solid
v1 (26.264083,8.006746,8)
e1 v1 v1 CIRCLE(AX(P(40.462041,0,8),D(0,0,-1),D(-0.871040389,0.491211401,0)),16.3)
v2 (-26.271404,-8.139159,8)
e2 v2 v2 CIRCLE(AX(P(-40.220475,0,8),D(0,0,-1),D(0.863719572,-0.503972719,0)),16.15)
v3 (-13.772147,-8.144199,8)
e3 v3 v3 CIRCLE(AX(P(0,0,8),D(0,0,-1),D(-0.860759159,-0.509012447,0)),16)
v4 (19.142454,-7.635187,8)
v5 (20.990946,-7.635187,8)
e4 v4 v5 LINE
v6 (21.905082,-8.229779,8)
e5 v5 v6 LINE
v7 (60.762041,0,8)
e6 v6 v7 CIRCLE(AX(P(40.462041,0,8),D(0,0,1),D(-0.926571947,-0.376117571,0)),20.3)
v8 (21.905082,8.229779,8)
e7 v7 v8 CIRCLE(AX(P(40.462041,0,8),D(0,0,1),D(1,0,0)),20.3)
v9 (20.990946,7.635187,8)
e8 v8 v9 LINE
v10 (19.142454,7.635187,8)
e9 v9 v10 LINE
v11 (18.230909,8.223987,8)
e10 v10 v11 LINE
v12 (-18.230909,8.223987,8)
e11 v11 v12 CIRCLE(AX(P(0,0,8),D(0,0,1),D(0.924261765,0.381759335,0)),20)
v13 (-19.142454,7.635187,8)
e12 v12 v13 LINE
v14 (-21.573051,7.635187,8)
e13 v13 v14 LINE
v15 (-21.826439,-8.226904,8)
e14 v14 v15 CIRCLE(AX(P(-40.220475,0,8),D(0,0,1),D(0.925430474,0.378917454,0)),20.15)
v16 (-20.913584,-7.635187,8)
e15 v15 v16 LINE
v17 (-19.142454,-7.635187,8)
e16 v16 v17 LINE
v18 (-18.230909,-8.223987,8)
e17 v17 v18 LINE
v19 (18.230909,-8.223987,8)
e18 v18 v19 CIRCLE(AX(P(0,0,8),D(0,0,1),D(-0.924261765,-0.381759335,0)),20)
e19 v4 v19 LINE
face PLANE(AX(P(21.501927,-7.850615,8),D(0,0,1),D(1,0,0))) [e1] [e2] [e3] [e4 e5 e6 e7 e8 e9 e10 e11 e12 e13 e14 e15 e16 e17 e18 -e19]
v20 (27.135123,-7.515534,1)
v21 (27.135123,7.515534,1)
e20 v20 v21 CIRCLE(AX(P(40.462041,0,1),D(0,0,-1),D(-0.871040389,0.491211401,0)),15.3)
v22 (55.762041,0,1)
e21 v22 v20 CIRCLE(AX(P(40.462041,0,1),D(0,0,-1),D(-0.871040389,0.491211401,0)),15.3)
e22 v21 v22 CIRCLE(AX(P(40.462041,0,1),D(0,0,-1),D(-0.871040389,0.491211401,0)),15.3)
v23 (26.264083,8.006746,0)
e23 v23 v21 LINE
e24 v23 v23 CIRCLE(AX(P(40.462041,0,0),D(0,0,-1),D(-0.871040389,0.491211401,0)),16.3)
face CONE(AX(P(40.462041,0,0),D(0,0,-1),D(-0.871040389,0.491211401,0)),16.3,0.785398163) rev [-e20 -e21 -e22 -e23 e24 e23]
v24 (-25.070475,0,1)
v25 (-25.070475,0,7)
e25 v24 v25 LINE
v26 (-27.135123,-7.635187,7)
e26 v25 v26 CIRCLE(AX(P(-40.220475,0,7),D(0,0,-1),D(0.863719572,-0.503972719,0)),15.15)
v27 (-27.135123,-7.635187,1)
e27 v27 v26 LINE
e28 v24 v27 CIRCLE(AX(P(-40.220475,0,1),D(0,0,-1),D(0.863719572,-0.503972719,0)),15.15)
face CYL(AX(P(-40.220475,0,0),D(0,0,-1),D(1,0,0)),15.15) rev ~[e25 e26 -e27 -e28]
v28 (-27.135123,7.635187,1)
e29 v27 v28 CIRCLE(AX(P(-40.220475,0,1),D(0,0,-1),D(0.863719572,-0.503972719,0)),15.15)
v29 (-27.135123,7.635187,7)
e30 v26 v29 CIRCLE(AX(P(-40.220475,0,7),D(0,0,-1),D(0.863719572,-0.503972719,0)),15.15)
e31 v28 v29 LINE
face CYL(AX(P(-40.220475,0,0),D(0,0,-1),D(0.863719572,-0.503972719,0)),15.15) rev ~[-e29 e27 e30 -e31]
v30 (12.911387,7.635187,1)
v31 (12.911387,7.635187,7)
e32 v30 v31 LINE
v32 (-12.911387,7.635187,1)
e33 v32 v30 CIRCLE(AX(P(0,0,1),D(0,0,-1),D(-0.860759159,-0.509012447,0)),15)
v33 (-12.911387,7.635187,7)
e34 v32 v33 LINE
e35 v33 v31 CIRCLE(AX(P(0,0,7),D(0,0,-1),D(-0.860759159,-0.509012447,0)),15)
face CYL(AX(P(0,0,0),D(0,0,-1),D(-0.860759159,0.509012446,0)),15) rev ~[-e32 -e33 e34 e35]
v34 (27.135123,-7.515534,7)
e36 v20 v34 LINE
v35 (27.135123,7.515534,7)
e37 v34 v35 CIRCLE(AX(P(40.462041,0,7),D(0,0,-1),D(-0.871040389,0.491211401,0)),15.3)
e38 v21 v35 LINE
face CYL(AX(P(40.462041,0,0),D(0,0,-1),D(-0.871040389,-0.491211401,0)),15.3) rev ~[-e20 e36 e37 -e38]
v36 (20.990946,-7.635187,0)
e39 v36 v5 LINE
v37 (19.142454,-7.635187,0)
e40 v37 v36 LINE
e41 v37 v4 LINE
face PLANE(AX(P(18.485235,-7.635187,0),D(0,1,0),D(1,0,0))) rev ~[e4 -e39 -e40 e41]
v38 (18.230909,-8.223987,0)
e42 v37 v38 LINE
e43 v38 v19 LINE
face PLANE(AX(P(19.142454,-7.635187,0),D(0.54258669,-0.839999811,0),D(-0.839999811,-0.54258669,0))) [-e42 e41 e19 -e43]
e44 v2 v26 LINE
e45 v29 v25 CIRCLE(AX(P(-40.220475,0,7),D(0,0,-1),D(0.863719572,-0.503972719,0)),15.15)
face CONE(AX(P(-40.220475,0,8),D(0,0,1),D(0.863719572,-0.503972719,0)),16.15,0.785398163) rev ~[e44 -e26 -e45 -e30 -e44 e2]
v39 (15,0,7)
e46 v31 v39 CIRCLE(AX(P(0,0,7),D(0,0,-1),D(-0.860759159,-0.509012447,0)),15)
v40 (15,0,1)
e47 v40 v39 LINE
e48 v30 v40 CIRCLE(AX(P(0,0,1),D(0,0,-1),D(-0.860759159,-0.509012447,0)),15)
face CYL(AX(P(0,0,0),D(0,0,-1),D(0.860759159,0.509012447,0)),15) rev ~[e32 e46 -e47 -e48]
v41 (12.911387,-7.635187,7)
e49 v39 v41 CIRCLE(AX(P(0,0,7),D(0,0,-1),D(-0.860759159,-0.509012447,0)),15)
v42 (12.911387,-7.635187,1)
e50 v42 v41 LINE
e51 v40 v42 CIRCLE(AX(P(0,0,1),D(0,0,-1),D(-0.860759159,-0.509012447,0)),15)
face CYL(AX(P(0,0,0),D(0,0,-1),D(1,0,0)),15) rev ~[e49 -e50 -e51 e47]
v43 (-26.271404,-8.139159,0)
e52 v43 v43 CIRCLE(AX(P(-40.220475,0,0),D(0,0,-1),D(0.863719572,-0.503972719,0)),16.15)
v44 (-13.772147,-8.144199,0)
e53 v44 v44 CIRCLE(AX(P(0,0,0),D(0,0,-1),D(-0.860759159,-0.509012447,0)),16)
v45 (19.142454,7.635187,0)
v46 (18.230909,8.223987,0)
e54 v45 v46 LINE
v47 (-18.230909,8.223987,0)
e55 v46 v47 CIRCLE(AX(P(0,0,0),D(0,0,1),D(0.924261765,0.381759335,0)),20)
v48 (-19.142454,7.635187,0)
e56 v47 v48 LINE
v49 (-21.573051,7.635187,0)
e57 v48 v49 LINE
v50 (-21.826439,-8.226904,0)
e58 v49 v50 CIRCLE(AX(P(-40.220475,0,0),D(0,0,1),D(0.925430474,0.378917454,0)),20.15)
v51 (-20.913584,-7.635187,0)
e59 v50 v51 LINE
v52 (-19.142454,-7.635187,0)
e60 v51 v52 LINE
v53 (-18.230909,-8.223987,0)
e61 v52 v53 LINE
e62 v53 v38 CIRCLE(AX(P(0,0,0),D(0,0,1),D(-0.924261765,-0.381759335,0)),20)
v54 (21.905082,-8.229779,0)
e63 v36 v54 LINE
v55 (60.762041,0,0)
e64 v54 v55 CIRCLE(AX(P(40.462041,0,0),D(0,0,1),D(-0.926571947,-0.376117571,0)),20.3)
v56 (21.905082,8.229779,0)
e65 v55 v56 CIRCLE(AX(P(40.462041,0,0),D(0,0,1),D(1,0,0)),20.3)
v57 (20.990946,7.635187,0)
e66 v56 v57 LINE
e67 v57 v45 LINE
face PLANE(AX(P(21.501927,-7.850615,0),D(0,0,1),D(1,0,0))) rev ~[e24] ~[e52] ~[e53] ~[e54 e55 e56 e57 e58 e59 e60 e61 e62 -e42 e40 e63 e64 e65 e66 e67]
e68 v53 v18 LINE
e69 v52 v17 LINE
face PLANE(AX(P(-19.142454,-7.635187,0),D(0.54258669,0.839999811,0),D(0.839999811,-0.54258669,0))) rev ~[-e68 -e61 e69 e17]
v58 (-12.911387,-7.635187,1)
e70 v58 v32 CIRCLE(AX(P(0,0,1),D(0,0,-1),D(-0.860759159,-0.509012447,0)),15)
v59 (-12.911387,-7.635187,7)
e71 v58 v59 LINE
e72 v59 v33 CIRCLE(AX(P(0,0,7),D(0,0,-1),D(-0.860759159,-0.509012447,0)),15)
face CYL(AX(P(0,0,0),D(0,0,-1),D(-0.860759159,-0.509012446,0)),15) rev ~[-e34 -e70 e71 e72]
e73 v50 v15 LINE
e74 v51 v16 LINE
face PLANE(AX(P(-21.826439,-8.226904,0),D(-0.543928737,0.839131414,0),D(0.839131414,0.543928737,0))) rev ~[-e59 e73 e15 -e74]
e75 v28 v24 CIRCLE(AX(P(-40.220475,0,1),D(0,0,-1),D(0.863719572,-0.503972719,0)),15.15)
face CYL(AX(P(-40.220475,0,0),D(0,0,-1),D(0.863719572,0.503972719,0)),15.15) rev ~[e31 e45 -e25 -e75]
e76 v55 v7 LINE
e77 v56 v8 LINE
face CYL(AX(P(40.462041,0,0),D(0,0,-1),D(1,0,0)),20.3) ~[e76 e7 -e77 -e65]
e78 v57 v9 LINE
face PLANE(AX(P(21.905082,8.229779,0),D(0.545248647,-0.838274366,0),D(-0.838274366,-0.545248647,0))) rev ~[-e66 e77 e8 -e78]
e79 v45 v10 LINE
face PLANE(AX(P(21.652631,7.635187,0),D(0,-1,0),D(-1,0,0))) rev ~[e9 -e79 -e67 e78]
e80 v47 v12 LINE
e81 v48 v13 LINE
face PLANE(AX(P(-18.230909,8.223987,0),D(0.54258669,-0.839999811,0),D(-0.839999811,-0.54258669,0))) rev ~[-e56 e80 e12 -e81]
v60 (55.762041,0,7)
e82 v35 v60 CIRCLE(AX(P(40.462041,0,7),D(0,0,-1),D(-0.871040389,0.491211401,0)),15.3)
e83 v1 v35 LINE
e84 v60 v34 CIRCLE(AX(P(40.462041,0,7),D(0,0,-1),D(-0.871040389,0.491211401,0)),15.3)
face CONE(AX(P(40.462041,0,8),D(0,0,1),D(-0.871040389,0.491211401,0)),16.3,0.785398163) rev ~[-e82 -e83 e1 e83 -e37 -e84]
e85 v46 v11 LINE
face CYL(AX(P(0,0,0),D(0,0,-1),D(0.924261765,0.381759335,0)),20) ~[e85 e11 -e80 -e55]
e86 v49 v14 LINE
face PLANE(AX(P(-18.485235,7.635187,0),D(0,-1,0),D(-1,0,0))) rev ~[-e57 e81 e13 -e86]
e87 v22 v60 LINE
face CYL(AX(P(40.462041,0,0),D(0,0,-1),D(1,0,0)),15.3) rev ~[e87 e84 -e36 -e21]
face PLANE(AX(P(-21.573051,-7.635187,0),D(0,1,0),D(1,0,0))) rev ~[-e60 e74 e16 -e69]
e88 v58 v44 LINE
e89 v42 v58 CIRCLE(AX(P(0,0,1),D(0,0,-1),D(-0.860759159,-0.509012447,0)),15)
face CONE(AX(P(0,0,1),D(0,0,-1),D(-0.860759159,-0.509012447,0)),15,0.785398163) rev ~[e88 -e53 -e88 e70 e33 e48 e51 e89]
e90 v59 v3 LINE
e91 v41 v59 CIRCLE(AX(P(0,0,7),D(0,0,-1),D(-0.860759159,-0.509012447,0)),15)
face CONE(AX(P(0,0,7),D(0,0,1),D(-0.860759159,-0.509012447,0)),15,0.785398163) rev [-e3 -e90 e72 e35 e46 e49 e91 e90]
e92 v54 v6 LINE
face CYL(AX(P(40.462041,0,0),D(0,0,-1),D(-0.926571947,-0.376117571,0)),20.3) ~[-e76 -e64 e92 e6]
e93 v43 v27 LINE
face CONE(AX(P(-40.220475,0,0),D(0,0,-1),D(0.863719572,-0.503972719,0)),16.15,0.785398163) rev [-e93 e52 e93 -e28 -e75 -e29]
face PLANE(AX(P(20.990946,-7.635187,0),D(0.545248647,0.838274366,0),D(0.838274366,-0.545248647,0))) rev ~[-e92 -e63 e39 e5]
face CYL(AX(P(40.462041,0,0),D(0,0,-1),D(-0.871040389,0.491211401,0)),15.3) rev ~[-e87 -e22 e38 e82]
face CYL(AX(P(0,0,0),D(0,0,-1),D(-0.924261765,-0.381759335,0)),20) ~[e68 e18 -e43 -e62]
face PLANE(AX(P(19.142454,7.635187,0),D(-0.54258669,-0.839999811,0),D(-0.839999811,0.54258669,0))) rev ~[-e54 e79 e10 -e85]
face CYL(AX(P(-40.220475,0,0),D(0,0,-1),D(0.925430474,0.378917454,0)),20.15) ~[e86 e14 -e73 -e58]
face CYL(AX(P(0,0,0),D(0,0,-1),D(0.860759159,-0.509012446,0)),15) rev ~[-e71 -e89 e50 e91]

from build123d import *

# Parameters (mm, degrees)
F1_DEPTH    = 8
F2_T1_DEPTH = 8


# Not quite as in the source:
# - a fillet or chamfer that OpenCascade refuses, or shapes differently, is made with other operations: its cross-section is extruded or revolved along the edge and cut away or added


with BuildPart() as f1:
    # F0 (on Top) → F1 (new body)
    with BuildSketch(Plane.XY):
        with BuildLine():
            ThreePointArc((12.9113873807, 7.6351866975), (14.4684278813, 3.9578522768), (15, 0))
            ThreePointArc((15, 0), (14.4684278813, -3.9578522768), (12.9113873807, -7.6351866975))
            Line((12.9113873807, -7.6351866975), (18.4852353, -7.6351866975))
            ThreePointArc((18.4852353, -7.6351866975), (19.6176541156, -3.8919978161), (20, 0))
            ThreePointArc((20, 0), (19.6176541156, 3.8919978161), (18.4852353, 7.6351866975))
            Line((18.4852353, 7.6351866975), (12.9113873807, 7.6351866975))
        make_face()
        with BuildLine():
            ThreePointArc((-12.9113873807, 7.6351866975), (0, 15), (12.9113873807, 7.6351866975))
            Line((12.9113873807, 7.6351866975), (18.4852353, 7.6351866975))
            ThreePointArc((18.4852353, 7.6351866975), (0, 20), (-18.4852353, 7.6351866975))
            Line((-18.4852353, 7.6351866975), (-12.9113873807, 7.6351866975))
        make_face()
        with BuildLine():
            Line((18.4852353, -7.6351866975), (12.9113873807, -7.6351866975))
            ThreePointArc((12.9113873807, -7.6351866975), (0, -15), (-12.9113873807, -7.6351866975))
            Line((-12.9113873807, -7.6351866975), (-18.4852353, -7.6351866975))
            ThreePointArc((-18.4852353, -7.6351866975), (0, -20), (18.4852353, -7.6351866975))
        make_face()
        with BuildLine():
            ThreePointArc((-12.9113873807, -7.6351866975), (-15, 0), (-12.9113873807, 7.6351866975))
            Line((-12.9113873807, 7.6351866975), (-18.4852353, 7.6351866975))
            ThreePointArc((-18.4852353, 7.6351866975), (-20, 0), (-18.4852353, -7.6351866975))
            Line((-18.4852353, -7.6351866975), (-12.9113873807, -7.6351866975))
        make_face()
        with BuildLine():
            Line((21.6526307541, 7.6351866975), (18.4852353, 7.6351866975))
            ThreePointArc((18.4852353, 7.6351866975), (19.6176541156, 3.8919978161), (20, 0))
            ThreePointArc((20, 0), (19.6176541156, -3.8919978161), (18.4852353, -7.6351866975))
            Line((18.4852353, -7.6351866975), (21.6526307541, -7.6351866975))
            ThreePointArc((21.6526307541, -7.6351866975), (20.1620412737, 0), (21.6526307541, 7.6351866975))
        make_face()
        with BuildLine():
            ThreePointArc((-18.4852353, -7.6351866975), (-20, 0), (-18.4852353, 7.6351866975))
            Line((-18.4852353, 7.6351866975), (-21.5730507637, 7.6351866975))
            ThreePointArc((-21.5730507637, 7.6351866975), (-20.4496870957, 3.8908164426), (-20.0704748243, 0))
            ThreePointArc((-20.0704748243, 0), (-20.4496870957, -3.8908164426), (-21.5730507637, -7.6351866975))
            Line((-21.5730507637, -7.6351866975), (-18.4852353, -7.6351866975))
        make_face()
        with BuildLine():
            Line((27.135123316, 7.6351866975), (21.6526307541, 7.6351866975))
            ThreePointArc((21.6526307541, 7.6351866975), (20.1620412737, 0), (21.6526307541, -7.6351866975))
            Line((21.6526307541, -7.6351866975), (27.135123316, -7.6351866975))
            Line((27.135123316, -7.6351866975), (27.135123316, -7.5155344287))
            ThreePointArc((27.135123316, -7.5155344287), (25.1620412737, 0), (27.135123316, 7.5155344287))
            Line((27.135123316, 7.5155344287), (27.135123316, 7.6351866975))
        make_face()
        with BuildLine():
            ThreePointArc((60.7620412737, 0), (44.3517049129, 19.9238680174), (21.6526307541, 7.6351866975))
            Line((21.6526307541, 7.6351866975), (27.135123316, 7.6351866975))
            Line((27.135123316, 7.6351866975), (27.135123316, 7.5155344287))
            ThreePointArc((27.135123316, 7.5155344287), (44.347151005, 14.7985108162), (55.7620412737, 0))
            ThreePointArc((55.7620412737, 0), (44.347151005, -14.7985108162), (27.135123316, -7.5155344287))
            Line((27.135123316, -7.5155344287), (27.135123316, -7.6351866975))
            Line((27.135123316, -7.6351866975), (21.6526307541, -7.6351866975))
            ThreePointArc((21.6526307541, -7.6351866975), (44.3517049129, -19.9238680174), (60.7620412737, 0))
        make_face()
        with BuildLine():
            Line((-27.135123316, 7.6351866975), (-21.5730507637, 7.6351866975))
            ThreePointArc((-21.5730507637, 7.6351866975), (-60.3704748243, 0), (-21.5730507637, -7.6351866975))
            Line((-21.5730507637, -7.6351866975), (-27.135123316, -7.6351866975))
            ThreePointArc((-27.135123316, -7.6351866975), (-55.3704748243, 0), (-27.135123316, 7.6351866975))
        make_face()
        with BuildLine():
            ThreePointArc((-20.0704748243, 0), (-20.4496870957, 3.8908164426), (-21.5730507637, 7.6351866975))
            Line((-21.5730507637, 7.6351866975), (-27.135123316, 7.6351866975))
            ThreePointArc((-27.135123316, 7.6351866975), (-25.5957427695, 3.9547076156), (-25.0704748243, 0))
            ThreePointArc((-25.0704748243, 0), (-25.5957427695, -3.9547076156), (-27.135123316, -7.6351866975))
            Line((-27.135123316, -7.6351866975), (-21.5730507637, -7.6351866975))
            ThreePointArc((-21.5730507637, -7.6351866975), (-20.4496870957, -3.8908164426), (-20.0704748243, 0))
        make_face()
    extrude(amount=F1_DEPTH)

    # F2: chamfer of 1 on 13 edges, made by hand

    # F2_s2 → F2_t1 (join)
    with BuildSketch(Plane.XY):
        with BuildLine():
            Line((20.9909460118, -7.6351866975), (21.9050819396, -8.2297788713))
            ThreePointArc((21.9050819396, -8.2297788713), (21.7829852925, -7.9487651651), (21.6526307541, -7.6351866975))
            Line((21.6526307541, -7.6351866975), (20.9909460118, -7.6351866975))
        make_face()
        with BuildLine():
            Line((-19.1424541452, -7.6351866975), (-18.2309087097, -8.2239873309))
            ThreePointArc((-18.2309087097, -8.2239873309), (-18.3538297184, -7.9458753243), (-18.4852353, -7.6351866975))
            Line((-18.4852353, -7.6351866975), (-19.1424541452, -7.6351866975))
        make_face()
        with BuildLine():
            Line((21.9050819396, 8.2297788713), (20.9909460118, 7.6351866975))
            Line((20.9909460118, 7.6351866975), (21.6526307541, 7.6351866975))
            ThreePointArc((21.6526307541, 7.6351866975), (21.7829852925, 7.9487651651), (21.9050819396, 8.2297788713))
        make_face()
        with BuildLine():
            Line((-18.2309087097, 8.2239873309), (-19.1424541452, 7.6351866975))
            Line((-19.1424541452, 7.6351866975), (-18.4852353, 7.6351866975))
            ThreePointArc((-18.4852353, 7.6351866975), (-18.3538297184, 7.9458753243), (-18.2309087097, 8.2239873309))
        make_face()
        with BuildLine():
            Line((19.1424541452, 7.6351866975), (18.2309087097, 8.2239873309))
            ThreePointArc((18.2309087097, 8.2239873309), (18.3538297184, 7.9458753243), (18.4852353, 7.6351866975))
            Line((18.4852353, 7.6351866975), (19.1424541452, 7.6351866975))
        make_face()
        with BuildLine():
            Line((19.1424541452, -7.6351866975), (18.2309087097, -8.2239873309))
            ThreePointArc((18.2309087097, -8.2239873309), (18.3538297184, -7.9458753243), (18.4852353, -7.6351866975))
            Line((18.4852353, -7.6351866975), (19.1424541452, -7.6351866975))
        make_face()
        with BuildLine():
            Line((-21.8264389289, -8.2269036385), (-20.9135835494, -7.6351866975))
            Line((-20.9135835494, -7.6351866975), (-21.5730507637, -7.6351866975))
            ThreePointArc((-21.5730507637, -7.6351866975), (-21.703929906, -7.9473306392), (-21.8264389289, -8.2269036385))
        make_face()
    extrude(amount=F2_T1_DEPTH)

    # F2_s3 → F2_t4 (revolve, cut)
    with BuildSketch(Plane(origin=(-10.2155381424, -17.5076147757, 0), x_dir=(0, 0, 1), z_dir=(0.5039727193, 0.8637195715, 0))):
        Polygon((8, -18.5892112809), (7, -19.5892112809), (8, -19.5892112809), align=None)
    revolve(axis=Axis((-40.2204748243, 0, 8), (0, 0, -1)), mode=Mode.SUBTRACT)

    # F2_s5 → F2_t6 (revolve, cut)
    with BuildSketch(Plane(origin=(0, 0, 0), x_dir=(0, 0, 1), z_dir=(0.5090124465, -0.8607591587, 0))):
        Polygon((7, 15), (8, 16), (8, 15), align=None)
    revolve(axis=Axis((0, 0, 8), (0, 0, -1)), mode=Mode.SUBTRACT)

    # F2_s7 → F2_t8 (revolve, cut)
    with BuildSketch(Plane(origin=(9.7630309126, 17.3122900606, 0), x_dir=(0, 0, 1), z_dir=(-0.4912114006, -0.8710403894, 0))):
        Polygon((8, -18.9440721866), (7, -19.9440721866), (8, -19.9440721866), align=None)
    revolve(axis=Axis((40.4620412737, 0, 8), (0, 0, -1)), mode=Mode.SUBTRACT)

    # F2_s9 → F2_t10 (revolve, cut)
    with BuildSketch(Plane(origin=(-10.2155381424, -17.5076147757, 0), x_dir=(0, 0, 1), z_dir=(0.5039727193, 0.8637195715, 0))):
        Polygon((0, -18.5892112809), (1, -19.5892112809), (0, -19.5892112809), align=None)
    revolve(axis=Axis((-40.2204748243, 0, 0), (0, 0, -1)), mode=Mode.SUBTRACT)

    # F2_s11 → F2_t12 (revolve, cut)
    with BuildSketch(Plane(origin=(0, 0, 0), x_dir=(0, 0, 1), z_dir=(0.5090124465, -0.8607591587, 0))):
        Polygon((1, 15), (0, 16), (0, 15), align=None)
    revolve(axis=Axis((0, 0, 0), (0, 0, -1)), mode=Mode.SUBTRACT)

    # F2_s13 → F2_t14 (revolve, cut)
    with BuildSketch(Plane(origin=(9.7630309126, 17.3122900606, 0), x_dir=(0, 0, 1), z_dir=(-0.4912114006, -0.8710403894, 0))):
        Polygon((0, -18.9440721866), (1, -19.9440721866), (0, -19.9440721866), align=None)
    revolve(axis=Axis((40.4620412737, 0, 0), (0, 0, -1)), mode=Mode.SUBTRACT)


solid = f1.part
